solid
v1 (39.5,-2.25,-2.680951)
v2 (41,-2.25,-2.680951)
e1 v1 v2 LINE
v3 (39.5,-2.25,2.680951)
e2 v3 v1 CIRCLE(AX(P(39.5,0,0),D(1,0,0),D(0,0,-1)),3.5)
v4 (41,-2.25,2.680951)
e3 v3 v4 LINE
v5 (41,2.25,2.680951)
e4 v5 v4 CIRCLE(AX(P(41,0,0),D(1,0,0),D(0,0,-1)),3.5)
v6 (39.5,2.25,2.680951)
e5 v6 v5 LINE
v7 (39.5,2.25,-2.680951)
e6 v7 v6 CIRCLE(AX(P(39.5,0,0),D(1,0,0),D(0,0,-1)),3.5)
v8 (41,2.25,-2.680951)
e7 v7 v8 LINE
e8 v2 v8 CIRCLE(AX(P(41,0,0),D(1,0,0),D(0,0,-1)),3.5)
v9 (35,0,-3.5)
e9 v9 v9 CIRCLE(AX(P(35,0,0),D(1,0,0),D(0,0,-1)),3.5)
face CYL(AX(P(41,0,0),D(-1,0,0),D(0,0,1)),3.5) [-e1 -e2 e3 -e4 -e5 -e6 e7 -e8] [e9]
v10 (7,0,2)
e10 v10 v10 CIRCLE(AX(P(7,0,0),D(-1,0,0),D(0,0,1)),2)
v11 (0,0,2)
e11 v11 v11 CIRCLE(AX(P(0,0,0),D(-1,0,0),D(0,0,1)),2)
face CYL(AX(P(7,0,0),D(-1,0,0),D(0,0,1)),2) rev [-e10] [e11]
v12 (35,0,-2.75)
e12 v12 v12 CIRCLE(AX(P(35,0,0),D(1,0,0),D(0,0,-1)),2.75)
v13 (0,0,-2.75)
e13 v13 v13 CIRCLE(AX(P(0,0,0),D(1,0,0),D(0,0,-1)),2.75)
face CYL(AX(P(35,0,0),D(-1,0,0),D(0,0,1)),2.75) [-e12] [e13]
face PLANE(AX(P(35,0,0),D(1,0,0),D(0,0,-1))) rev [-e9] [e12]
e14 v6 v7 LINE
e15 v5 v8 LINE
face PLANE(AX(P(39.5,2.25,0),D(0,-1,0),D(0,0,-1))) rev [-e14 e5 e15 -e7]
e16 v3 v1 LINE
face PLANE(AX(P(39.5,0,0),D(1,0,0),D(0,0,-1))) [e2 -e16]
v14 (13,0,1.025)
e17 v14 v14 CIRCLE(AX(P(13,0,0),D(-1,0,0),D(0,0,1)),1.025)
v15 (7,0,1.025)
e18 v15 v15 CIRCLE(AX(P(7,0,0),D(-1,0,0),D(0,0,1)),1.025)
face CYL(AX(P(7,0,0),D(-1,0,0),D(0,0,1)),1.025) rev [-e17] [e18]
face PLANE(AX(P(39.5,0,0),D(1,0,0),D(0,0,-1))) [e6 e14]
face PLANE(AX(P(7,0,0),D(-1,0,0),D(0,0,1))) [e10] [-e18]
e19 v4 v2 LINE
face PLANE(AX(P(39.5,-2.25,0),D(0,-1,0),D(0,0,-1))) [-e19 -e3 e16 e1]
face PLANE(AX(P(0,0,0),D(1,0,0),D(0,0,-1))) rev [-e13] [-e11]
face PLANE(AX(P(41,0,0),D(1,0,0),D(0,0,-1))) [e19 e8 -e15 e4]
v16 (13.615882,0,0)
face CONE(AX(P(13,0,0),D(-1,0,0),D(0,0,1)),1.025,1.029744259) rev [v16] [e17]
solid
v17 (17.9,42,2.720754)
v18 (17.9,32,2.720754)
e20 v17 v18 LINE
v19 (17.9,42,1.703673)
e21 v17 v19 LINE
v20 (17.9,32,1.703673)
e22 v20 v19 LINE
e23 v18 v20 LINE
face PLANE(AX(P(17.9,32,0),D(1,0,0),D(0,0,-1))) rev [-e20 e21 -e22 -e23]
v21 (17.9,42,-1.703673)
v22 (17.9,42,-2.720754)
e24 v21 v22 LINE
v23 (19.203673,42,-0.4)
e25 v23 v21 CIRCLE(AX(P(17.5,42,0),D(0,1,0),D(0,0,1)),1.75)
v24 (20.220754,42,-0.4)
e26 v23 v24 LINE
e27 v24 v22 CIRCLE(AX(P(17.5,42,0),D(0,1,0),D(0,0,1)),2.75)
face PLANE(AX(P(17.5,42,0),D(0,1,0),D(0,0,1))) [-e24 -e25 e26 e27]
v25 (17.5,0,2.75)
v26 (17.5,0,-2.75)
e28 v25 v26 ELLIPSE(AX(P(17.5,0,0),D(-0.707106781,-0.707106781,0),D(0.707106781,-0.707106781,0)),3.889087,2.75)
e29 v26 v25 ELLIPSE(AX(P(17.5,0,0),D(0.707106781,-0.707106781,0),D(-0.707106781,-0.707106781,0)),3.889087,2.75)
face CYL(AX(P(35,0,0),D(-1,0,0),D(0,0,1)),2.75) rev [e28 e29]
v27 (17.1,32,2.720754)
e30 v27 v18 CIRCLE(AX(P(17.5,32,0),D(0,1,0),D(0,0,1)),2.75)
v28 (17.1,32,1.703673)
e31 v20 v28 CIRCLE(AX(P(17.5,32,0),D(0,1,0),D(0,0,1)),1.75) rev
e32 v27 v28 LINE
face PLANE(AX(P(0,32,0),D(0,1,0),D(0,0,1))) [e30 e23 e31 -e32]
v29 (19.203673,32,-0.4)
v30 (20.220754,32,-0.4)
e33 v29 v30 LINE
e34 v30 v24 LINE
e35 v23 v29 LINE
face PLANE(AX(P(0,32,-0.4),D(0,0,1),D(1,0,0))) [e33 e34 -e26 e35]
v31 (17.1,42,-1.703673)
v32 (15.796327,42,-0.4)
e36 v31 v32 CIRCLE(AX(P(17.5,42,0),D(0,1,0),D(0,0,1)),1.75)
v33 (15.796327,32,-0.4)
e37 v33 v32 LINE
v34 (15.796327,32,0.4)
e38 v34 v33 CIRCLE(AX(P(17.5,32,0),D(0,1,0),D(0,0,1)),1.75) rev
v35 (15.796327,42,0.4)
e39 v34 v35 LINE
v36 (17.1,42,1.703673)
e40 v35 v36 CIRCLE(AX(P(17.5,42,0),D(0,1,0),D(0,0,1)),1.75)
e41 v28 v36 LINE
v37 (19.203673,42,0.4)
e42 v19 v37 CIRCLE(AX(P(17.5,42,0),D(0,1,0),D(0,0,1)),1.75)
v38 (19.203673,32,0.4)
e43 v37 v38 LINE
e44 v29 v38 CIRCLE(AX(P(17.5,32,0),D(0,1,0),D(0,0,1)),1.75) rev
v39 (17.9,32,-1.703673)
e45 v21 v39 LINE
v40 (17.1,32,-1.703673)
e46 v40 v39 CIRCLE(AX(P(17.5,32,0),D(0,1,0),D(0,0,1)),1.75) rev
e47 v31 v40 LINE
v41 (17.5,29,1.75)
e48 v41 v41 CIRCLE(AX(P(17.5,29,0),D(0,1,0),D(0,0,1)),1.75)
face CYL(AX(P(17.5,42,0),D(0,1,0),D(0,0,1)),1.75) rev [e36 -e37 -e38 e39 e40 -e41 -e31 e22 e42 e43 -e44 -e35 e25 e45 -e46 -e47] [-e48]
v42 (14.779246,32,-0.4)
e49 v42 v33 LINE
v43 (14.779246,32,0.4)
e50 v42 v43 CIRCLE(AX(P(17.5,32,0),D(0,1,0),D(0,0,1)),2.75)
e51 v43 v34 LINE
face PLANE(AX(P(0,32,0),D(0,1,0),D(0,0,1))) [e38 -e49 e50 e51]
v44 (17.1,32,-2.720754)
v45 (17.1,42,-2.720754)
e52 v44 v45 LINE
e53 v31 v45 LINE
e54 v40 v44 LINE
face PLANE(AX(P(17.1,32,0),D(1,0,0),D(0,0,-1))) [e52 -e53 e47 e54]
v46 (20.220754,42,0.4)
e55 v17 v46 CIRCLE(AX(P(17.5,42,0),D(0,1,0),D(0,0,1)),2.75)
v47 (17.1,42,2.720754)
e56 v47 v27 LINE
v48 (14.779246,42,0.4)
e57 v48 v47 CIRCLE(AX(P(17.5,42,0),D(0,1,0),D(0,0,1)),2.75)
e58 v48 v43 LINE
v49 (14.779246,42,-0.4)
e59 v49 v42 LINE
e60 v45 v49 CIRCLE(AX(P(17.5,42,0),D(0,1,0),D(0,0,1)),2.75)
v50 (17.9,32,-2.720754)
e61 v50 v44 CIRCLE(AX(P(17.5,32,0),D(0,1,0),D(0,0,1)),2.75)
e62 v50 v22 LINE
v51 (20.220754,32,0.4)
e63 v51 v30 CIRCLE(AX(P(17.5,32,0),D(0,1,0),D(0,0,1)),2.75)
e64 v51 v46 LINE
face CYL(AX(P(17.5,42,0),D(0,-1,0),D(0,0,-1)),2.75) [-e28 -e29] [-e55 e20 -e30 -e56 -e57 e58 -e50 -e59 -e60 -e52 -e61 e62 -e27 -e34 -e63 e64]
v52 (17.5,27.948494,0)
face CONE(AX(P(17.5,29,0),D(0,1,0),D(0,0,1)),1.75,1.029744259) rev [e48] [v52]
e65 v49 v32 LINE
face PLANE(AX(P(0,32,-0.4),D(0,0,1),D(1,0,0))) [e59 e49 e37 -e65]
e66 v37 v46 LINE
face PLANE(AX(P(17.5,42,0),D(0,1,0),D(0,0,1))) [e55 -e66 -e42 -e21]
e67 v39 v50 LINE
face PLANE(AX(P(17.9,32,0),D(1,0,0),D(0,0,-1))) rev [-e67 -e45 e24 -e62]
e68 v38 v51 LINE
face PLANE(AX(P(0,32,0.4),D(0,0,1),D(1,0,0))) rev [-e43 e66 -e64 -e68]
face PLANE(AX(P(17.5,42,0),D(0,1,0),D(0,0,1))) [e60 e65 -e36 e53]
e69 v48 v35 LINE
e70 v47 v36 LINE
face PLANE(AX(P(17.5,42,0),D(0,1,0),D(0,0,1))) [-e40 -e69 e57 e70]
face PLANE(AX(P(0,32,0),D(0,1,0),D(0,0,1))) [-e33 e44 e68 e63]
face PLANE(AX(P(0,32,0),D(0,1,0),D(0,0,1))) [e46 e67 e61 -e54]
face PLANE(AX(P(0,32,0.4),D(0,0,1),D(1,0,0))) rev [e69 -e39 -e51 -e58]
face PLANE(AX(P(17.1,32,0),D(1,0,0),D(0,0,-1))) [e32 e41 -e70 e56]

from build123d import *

# Parameters (mm, degrees)
SKETCH_1_R                 = 2.75
EXTRUDE_1_DEPTH            = 35
SKETCH_2_R                 = 2.75
EXTRUDE_2_DEPTH            = 42
SKETCH_4_W                 = 0.8
SKETCH_4_H                 = 0.8
CUT_EXTRUDE_1_DEPTH        = 10
SKETCH_5_R                 = 3.5
EXTRUDE_3_DEPTH            = 6
CUT_EXTRUDE_START          = -1.5
CUT_EXTRUDE_2_DEPTH        = 1.5
SKETCH_7_R                 = 2
CUT_EXTRUDE_3_DEPTH        = 7
SPLIT_START                = 14
SPLIT_BODIES_1_DEPTH       = 7
SPLIT_BODIES_1_2_OUTLINE_R = 2.75
SPLIT_BODIES_1_2_DEPTH     = 2.75
SPLIT_BODIES_1_3_DEPTH     = 7


with BuildPart() as part:
    # Эскиз1 → Бобышка-Вытянуть1 (new body)
    with BuildSketch(Plane(origin=(0, 0, 0), x_dir=(0, 0, -1), z_dir=(1, 0, 0))):
        Circle(SKETCH_1_R)
    extrude(amount=EXTRUDE_1_DEPTH)

    # Эскиз5 → Бобышка-Вытянуть3 (add)
    with BuildSketch(Plane(origin=(35, 0, 0), x_dir=(0, 0, -1), z_dir=(1, 0, 0))):
        Circle(SKETCH_5_R)
    extrude(amount=EXTRUDE_3_DEPTH)

    # Эскиз6 → Вырез-Вытянуть2 (cut)
    with BuildSketch(Plane(origin=(41, 0, 0), x_dir=(0, 0, -1), z_dir=(1, 0, 0)).offset(CUT_EXTRUDE_START)):
        with BuildLine():
            ThreePointArc((2.680951324, 2.25), (0, 3.5), (-2.680951324, 2.25))
            Line((-2.680951324, 2.25), (2.680951324, 2.25))
        make_face()
        with BuildLine():
            Line((2.680951324, -2.25), (-2.680951324, -2.25))
            ThreePointArc((-2.680951324, -2.25), (0, -3.5), (2.680951324, -2.25))
        make_face()
    extrude(amount=CUT_EXTRUDE_2_DEPTH, mode=Mode.SUBTRACT)

    # Эскиз7 → Вырез-Вытянуть3 (cut)
    with BuildSketch(Plane.ZY):
        Circle(SKETCH_7_R)
    extrude(amount=-CUT_EXTRUDE_3_DEPTH, mode=Mode.SUBTRACT)

    # Эскиз8 → Отверстие обработанное метчиком M2.5x0.451 (revolve, cut)
    with BuildSketch(Plane(origin=(7, 0, 0), x_dir=(0, 0, 1), z_dir=(0, 1, 0))):
        Polygon((0, 0), (0, 6.615882135), (1.025, 6), (1.025, 0), align=None)
    revolve(axis=Axis((0.65, 0, 0), (1, 0, 0)), mode=Mode.SUBTRACT)


with BuildPart() as body_2:
    # Эскиз2 → Бобышка-Вытянуть2 (new body)
    with BuildSketch(Plane(origin=(0, 0, 0), x_dir=(1, 0, 0), z_dir=(0, 1, 0))):
        with Locations(Location((17.5, 0, 0), (0, 0, 90))):
            Circle(SKETCH_2_R)
    extrude(amount=EXTRUDE_2_DEPTH)

    # Эскиз3 → Диаметр отверстия Ø3.5 (3.5)1 (revolve, cut)
    with BuildSketch(Plane(origin=(17.5, 42, 0), x_dir=(0, 0, 1), z_dir=(1, 0, 0))):
        Polygon((0, 0), (0, 14.051506083), (1.75, 13), (1.75, 0), align=None)
    revolve(axis=Axis((17.5, 48.35, 0), (0, -1, 0)), mode=Mode.SUBTRACT)

    # Эскиз4 → Вырез-Вытянуть1 (cut)
    with BuildSketch(Plane(origin=(0, 42, 0), x_dir=(1, 0, 0), z_dir=(0, 1, 0))):
        with BuildLine():
            Line((17.1, 4), (17.1, 2.720753572))
            ThreePointArc((17.1, 2.720753572), (17.5, 2.75), (17.9, 2.720753572))
            Line((17.9, 2.720753572), (17.9, 4))
            Line((17.9, 4), (17.1, 4))
        make_face()
        with BuildLine():
            Line((17.1, -1.703672504), (17.1, -2.720753572))
            ThreePointArc((17.1, -2.720753572), (17.5, -2.75), (17.9, -2.720753572))
            Line((17.9, -2.720753572), (17.9, -1.703672504))
            ThreePointArc((17.9, -1.703672504), (17.5, -1.75), (17.1, -1.703672504))
        make_face()
        with BuildLine():
            ThreePointArc((17.9, 2.720753572), (17.5, 2.75), (17.1, 2.720753572))
            Line((17.1, 2.720753572), (17.1, 1.703672504))
            ThreePointArc((17.1, 1.703672504), (17.5, 1.75), (17.9, 1.703672504))
            Line((17.9, 1.703672504), (17.9, 2.720753572))
        make_face()
        with BuildLine():
            Line((17.1, 1.703672504), (17.1, 0.4))
            Line((17.1, 0.4), (17.9, 0.4))
            Line((17.9, 0.4), (17.9, 1.703672504))
            ThreePointArc((17.9, 1.703672504), (17.5, 1.75), (17.1, 1.703672504))
        make_face()
        with Locations((17.5, 0)):
            Rectangle(SKETCH_4_W, SKETCH_4_H)
        with BuildLine():
            Line((15.796327496, -0.4), (17.1, -0.4))
            Line((17.1, -0.4), (17.1, 0.4))
            Line((17.1, 0.4), (15.796327496, 0.4))
            ThreePointArc((15.796327496, 0.4), (15.75, 0), (15.796327496, -0.4))
        make_face()
        with BuildLine():
            ThreePointArc((14.779246428, 0.4), (14.75, 0), (14.779246428, -0.4))
            Line((14.779246428, -0.4), (15.796327496, -0.4))
            ThreePointArc((15.796327496, -0.4), (15.75, 0), (15.796327496, 0.4))
            Line((15.796327496, 0.4), (14.779246428, 0.4))
        make_face()
        with BuildLine():
            Line((19.203672504, -0.4), (20.220753572, -0.4))
            ThreePointArc((20.220753572, -0.4), (20.242678647, -0.200533883), (20.25, 0))
            ThreePointArc((20.25, 0), (20.242678647, 0.200533883), (20.220753572, 0.4))
            Line((20.220753572, 0.4), (19.203672504, 0.4))
            ThreePointArc((19.203672504, 0.4), (19.238379545, 0.20133693), (19.25, 0))
            ThreePointArc((19.25, 0), (19.238379545, -0.20133693), (19.203672504, -0.4))
        make_face()
        with BuildLine():
            Line((13.5, -0.4), (14.779246428, -0.4))
            ThreePointArc((14.779246428, -0.4), (14.75, 0), (14.779246428, 0.4))
            Line((14.779246428, 0.4), (13.5, 0.4))
            Line((13.5, 0.4), (13.5, -0.4))
        make_face()
        with BuildLine():
            Line((17.1, -0.4), (17.1, -1.703672504))
            ThreePointArc((17.1, -1.703672504), (17.5, -1.75), (17.9, -1.703672504))
            Line((17.9, -1.703672504), (17.9, -0.4))
            Line((17.9, -0.4), (17.1, -0.4))
        make_face()
        with BuildLine():
            Line((17.1, -2.720753572), (17.1, -4))
            Line((17.1, -4), (17.9, -4))
            Line((17.9, -4), (17.9, -2.720753572))
            ThreePointArc((17.9, -2.720753572), (17.5, -2.75), (17.1, -2.720753572))
        make_face()
        with BuildLine():
            Line((17.9, 0.4), (17.9, -0.4))
            Line((17.9, -0.4), (19.203672504, -0.4))
            ThreePointArc((19.203672504, -0.4), (19.238379545, -0.20133693), (19.25, 0))
            ThreePointArc((19.25, 0), (19.238379545, 0.20133693), (19.203672504, 0.4))
            Line((19.203672504, 0.4), (17.9, 0.4))
        make_face()
        with BuildLine():
            ThreePointArc((20.25, 0), (20.242678647, -0.200533883), (20.220753572, -0.4))
            Line((20.220753572, -0.4), (21.5, -0.4))
            Line((21.5, -0.4), (21.5, 0.4))
            Line((21.5, 0.4), (20.220753572, 0.4))
            ThreePointArc((20.220753572, 0.4), (20.242678647, 0.200533883), (20.25, 0))
        make_face()
    extrude(amount=-CUT_EXTRUDE_1_DEPTH, mode=Mode.SUBTRACT)

    # Split Bodies 1: read off the stored shape, not the designer's step
    # Split Bodies 1 outline → Split Bodies 1 (cut)
    with BuildSketch(Plane.YZ.offset(SPLIT_START)):
        with BuildLine():
            ThreePointArc((0, -2.75), (2.75, 0), (0, 2.75))
            Line((0, 2.75), (0, -2.75))
        make_face()
    extrude(amount=SPLIT_BODIES_1_DEPTH, mode=Mode.SUBTRACT)


with BuildPart() as body_3:
    # Split Bodies 1 2 outline → Split Bodies 1 2 (new body)
    with BuildSketch(Plane(origin=(0, 0, 0), x_dir=(1, 0, 0), z_dir=(0, 1, 0))):
        with Locations((17.5, 0)):
            Circle(SPLIT_BODIES_1_2_OUTLINE_R)
    extrude(amount=SPLIT_BODIES_1_2_DEPTH)

    # Split Bodies 1 3 outline → Split Bodies 1 3 (cut)
    with BuildSketch(Plane.YZ.offset(SPLIT_START)):
        with BuildLine():
            Line((-1, 2.75), (0, 2.75))
            ThreePointArc((0, 2.75), (1.944543648, 1.944543648), (2.75, 0))
            Line((2.75, 0), (2.75, 4))
            Line((2.75, 4), (-1, 4))
            Line((-1, 4), (-1, 2.75))
        make_face()
        with BuildLine():
            Line((2.75, -4), (2.75, 0))
            ThreePointArc((2.75, 0), (1.944543648, -1.944543648), (0, -2.75))
            Line((0, -2.75), (-1, -2.75))
            Line((-1, -2.75), (-1, -4))
            Line((-1, -4), (2.75, -4))
        make_face()
    extrude(amount=SPLIT_BODIES_1_3_DEPTH, mode=Mode.SUBTRACT)


solid = Compound([part.part, body_2.part])
